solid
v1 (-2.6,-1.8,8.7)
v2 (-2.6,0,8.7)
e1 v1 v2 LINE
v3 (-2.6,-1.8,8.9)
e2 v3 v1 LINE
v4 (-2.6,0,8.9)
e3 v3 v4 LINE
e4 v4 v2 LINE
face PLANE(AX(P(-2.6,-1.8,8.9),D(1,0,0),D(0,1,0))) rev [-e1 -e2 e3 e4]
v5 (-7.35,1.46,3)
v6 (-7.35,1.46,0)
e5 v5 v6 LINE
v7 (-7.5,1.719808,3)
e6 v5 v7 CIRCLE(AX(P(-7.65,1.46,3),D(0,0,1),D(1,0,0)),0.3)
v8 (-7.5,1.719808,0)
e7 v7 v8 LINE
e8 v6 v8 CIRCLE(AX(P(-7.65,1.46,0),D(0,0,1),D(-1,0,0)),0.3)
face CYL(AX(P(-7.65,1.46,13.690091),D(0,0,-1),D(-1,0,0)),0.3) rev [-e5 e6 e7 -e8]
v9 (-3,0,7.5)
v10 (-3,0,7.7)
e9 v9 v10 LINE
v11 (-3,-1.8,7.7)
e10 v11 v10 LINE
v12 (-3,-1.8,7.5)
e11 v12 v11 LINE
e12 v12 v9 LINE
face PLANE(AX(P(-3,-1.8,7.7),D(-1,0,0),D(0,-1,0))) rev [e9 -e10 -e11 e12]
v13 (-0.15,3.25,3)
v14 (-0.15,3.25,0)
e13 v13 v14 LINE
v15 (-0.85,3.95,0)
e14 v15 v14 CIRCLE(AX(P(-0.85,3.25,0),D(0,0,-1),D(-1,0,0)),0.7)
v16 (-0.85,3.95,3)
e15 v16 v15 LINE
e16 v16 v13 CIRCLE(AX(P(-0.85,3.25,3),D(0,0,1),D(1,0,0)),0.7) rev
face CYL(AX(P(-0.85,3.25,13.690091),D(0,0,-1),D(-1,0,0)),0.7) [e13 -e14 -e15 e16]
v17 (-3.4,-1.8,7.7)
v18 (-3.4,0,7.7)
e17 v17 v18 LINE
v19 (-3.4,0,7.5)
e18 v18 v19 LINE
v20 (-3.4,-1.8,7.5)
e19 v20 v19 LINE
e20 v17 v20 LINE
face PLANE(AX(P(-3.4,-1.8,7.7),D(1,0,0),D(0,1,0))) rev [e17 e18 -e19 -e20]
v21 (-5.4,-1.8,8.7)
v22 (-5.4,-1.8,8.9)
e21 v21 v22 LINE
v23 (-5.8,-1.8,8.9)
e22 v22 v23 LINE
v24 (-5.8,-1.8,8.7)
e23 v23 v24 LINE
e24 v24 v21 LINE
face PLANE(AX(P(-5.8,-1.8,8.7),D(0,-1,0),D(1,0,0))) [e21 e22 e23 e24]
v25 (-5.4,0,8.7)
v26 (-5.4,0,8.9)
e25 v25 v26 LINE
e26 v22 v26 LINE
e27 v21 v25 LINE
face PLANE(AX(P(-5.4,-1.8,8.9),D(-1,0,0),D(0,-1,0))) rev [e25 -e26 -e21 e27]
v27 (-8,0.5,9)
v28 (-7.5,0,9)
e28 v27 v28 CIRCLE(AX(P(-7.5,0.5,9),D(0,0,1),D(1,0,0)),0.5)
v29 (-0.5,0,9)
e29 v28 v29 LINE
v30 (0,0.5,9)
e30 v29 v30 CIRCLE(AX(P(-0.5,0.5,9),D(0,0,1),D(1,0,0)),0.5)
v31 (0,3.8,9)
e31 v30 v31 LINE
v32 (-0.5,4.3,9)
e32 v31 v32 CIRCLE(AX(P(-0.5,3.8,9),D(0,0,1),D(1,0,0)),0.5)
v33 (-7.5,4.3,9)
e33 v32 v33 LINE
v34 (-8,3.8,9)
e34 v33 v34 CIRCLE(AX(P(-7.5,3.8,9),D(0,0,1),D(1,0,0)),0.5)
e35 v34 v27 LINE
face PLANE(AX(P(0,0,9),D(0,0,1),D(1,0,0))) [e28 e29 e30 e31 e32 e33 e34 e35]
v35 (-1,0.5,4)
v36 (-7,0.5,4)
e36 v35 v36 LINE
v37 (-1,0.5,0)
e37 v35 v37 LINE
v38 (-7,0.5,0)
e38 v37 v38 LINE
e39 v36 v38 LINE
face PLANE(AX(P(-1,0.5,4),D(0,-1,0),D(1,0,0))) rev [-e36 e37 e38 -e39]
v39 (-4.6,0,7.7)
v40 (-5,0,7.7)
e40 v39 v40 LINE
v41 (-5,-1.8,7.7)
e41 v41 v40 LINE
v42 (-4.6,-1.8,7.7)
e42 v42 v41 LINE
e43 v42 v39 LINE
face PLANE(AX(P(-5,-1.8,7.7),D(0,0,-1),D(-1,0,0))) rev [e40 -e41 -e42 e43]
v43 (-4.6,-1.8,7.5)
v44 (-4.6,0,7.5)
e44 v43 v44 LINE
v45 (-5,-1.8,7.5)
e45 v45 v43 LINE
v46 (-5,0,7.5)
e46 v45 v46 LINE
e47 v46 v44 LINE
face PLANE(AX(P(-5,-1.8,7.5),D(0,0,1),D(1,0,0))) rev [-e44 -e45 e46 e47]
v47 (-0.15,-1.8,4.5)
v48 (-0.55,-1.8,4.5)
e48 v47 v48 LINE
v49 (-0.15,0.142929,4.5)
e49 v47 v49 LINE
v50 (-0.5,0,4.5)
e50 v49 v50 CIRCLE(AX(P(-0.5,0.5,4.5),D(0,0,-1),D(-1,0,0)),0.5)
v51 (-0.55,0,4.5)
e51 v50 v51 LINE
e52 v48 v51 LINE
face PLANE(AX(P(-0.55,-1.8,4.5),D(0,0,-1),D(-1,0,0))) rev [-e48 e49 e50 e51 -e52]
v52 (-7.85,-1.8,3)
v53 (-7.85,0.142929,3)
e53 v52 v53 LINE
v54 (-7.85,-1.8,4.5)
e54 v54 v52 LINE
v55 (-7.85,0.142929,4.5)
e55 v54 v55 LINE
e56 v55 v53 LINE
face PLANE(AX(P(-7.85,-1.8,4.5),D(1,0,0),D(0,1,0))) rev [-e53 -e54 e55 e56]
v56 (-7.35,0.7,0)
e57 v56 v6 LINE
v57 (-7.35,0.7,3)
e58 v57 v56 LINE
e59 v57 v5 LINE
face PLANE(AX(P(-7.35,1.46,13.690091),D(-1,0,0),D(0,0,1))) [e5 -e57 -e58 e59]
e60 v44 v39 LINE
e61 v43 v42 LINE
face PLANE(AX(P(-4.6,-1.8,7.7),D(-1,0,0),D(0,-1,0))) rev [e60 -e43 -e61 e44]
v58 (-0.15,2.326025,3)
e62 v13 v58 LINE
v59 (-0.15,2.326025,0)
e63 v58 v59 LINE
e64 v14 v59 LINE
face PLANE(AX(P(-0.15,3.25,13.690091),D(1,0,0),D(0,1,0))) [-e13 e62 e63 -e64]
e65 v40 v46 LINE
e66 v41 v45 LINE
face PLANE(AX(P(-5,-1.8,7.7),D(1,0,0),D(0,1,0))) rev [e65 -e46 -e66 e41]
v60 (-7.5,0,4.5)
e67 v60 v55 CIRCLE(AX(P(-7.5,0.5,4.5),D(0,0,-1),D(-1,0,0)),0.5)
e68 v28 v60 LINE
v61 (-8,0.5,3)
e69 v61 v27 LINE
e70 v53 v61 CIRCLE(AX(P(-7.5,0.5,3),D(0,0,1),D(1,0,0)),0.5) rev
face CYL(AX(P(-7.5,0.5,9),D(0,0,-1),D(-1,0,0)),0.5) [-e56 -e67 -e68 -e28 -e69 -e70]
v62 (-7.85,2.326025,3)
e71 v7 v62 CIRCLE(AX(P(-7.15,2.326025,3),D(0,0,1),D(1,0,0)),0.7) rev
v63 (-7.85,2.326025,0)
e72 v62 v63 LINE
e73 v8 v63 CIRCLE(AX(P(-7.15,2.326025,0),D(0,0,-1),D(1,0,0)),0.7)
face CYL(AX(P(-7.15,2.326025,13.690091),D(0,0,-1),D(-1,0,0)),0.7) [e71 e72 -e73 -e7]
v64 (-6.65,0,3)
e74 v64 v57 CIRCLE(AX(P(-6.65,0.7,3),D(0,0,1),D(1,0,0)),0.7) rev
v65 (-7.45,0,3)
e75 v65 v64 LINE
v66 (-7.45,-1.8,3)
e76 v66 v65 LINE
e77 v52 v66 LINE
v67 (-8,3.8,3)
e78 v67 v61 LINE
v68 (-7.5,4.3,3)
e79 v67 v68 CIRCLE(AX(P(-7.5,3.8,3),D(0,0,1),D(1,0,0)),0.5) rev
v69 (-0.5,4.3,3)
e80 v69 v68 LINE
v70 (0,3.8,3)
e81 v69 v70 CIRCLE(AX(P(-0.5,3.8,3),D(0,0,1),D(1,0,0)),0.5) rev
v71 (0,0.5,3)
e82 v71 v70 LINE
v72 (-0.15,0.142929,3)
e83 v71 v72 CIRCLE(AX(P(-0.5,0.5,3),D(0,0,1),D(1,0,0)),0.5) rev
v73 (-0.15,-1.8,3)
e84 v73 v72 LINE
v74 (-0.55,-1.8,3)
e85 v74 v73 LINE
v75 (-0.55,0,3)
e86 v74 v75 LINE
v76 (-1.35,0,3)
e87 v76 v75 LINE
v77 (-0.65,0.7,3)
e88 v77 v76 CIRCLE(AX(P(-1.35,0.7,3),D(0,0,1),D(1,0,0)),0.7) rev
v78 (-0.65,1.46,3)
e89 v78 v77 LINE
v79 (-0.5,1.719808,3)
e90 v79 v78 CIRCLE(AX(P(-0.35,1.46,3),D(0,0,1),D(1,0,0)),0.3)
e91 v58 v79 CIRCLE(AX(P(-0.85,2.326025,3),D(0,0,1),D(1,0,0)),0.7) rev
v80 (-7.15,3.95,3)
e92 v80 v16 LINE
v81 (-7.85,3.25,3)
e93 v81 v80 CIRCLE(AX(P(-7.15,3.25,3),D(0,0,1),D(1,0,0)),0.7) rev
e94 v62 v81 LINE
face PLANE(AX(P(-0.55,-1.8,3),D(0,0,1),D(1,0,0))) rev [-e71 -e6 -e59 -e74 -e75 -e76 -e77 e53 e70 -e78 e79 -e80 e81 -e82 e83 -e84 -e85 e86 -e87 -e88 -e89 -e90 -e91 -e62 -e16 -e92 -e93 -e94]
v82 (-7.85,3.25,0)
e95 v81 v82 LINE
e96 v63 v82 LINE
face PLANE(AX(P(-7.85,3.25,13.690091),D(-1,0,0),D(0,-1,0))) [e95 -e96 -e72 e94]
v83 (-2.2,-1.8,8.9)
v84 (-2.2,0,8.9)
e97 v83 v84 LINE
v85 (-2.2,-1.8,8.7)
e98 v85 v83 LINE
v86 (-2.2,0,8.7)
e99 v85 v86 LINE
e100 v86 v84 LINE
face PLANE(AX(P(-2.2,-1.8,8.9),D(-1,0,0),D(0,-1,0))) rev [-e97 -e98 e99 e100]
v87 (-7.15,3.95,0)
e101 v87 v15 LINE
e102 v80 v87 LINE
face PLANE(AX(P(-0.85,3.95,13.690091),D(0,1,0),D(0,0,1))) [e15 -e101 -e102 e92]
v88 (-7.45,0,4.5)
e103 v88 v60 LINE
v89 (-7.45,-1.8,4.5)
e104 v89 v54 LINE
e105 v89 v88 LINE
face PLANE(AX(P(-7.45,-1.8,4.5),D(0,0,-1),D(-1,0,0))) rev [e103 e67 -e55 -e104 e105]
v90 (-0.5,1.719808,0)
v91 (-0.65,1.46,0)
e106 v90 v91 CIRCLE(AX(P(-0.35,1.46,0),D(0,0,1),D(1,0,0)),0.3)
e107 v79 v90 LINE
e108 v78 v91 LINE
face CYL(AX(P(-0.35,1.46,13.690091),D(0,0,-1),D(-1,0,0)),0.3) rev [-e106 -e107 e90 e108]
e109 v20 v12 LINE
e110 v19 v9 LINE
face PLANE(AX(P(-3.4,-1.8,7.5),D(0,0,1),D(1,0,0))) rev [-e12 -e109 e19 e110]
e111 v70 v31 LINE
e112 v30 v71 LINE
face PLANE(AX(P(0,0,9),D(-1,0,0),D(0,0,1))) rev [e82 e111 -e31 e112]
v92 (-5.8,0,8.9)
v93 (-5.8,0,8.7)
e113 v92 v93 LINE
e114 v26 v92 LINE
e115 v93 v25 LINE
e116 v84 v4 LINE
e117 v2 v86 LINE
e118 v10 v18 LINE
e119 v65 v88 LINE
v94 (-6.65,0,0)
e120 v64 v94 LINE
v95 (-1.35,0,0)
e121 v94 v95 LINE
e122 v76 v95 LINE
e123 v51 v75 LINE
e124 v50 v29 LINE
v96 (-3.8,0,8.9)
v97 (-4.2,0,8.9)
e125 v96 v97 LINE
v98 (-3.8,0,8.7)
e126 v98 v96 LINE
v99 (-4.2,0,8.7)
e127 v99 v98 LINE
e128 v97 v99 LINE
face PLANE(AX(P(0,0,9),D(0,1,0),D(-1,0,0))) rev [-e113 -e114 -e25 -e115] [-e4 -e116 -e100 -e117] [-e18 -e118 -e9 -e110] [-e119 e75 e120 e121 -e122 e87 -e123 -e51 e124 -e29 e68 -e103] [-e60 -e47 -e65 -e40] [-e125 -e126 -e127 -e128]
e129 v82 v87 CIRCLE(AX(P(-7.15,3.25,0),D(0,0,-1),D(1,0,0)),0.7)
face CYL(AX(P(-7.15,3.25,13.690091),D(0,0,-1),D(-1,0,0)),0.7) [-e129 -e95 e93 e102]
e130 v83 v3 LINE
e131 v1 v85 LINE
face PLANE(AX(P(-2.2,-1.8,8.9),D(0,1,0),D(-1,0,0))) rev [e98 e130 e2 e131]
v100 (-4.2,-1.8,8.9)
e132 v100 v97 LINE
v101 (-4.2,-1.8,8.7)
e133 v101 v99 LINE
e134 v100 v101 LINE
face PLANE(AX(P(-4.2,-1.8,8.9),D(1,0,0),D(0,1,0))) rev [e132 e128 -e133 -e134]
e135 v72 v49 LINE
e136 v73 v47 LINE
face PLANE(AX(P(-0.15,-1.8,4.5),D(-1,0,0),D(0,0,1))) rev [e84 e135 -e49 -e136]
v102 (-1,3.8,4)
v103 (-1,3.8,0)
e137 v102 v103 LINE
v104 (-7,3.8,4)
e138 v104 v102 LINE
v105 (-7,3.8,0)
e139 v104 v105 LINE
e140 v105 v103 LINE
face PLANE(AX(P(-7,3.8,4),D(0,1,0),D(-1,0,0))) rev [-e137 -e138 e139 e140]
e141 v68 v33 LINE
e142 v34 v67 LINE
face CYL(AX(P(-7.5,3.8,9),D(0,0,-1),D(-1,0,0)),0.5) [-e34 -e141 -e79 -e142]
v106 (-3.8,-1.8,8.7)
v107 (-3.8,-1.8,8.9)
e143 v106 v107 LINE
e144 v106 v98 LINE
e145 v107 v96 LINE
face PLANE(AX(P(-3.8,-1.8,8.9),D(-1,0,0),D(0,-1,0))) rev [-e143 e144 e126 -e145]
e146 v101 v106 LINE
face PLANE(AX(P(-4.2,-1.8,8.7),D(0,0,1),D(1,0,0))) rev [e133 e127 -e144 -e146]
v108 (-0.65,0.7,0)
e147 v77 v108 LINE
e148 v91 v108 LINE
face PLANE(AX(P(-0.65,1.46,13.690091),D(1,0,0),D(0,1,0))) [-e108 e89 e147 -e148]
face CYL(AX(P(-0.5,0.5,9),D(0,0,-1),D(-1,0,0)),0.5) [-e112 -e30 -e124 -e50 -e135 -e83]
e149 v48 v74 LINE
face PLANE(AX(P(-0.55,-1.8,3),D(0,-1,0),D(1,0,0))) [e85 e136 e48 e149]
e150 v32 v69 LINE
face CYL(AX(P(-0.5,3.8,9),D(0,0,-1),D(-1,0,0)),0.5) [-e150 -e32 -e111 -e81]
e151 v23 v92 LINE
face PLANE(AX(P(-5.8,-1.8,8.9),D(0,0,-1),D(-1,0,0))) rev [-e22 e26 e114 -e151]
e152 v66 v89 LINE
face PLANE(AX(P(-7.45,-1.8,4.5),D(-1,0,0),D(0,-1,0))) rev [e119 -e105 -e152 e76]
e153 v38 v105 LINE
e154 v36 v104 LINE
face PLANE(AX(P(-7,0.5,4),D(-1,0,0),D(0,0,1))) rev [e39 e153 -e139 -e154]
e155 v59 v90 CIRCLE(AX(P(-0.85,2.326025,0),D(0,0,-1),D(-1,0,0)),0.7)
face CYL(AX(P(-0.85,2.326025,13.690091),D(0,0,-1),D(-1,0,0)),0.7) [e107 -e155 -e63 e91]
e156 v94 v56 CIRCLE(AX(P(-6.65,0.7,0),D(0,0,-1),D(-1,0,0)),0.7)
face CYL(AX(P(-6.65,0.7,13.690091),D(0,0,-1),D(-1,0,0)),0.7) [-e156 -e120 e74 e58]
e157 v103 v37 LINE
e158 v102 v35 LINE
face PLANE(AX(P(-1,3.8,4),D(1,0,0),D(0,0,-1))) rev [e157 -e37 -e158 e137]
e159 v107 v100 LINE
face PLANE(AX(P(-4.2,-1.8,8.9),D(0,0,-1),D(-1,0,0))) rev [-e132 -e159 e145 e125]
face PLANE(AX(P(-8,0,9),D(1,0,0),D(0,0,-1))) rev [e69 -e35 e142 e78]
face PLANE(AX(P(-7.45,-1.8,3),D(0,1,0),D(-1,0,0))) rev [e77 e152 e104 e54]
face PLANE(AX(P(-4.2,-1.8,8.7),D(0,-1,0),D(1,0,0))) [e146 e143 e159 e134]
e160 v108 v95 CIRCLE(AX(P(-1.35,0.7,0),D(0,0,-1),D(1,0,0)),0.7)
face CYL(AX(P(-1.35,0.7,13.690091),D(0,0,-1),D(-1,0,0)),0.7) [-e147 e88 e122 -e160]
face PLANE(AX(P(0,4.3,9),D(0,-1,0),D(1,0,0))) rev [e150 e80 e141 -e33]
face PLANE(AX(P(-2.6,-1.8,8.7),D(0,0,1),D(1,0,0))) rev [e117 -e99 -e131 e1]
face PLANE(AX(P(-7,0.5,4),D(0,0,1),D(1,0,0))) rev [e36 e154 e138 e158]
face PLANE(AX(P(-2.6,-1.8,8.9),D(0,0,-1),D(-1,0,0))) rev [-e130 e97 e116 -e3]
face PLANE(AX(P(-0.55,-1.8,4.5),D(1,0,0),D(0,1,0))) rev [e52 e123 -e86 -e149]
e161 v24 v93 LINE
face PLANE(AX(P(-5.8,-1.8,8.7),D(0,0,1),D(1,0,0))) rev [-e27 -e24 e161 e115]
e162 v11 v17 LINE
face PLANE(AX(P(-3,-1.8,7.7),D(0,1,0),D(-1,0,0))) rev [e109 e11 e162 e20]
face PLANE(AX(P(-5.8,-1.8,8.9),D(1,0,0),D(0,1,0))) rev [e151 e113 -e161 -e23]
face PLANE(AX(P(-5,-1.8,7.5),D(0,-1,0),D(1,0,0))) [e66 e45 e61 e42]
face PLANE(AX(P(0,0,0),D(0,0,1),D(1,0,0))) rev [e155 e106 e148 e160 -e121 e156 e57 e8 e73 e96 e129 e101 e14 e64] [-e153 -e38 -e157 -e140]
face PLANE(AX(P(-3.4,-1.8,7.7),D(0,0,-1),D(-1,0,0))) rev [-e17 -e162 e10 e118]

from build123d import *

# Parameters (mm, degrees)
ESQUISSE1_W             = 8
ESQUISSE1_H             = 4.3
EXTRUSION1_DEPTH        = 9
ESQUISSE2_W             = 6
ESQUISSE2_H             = 3.3
ENL_V_MAT_EXTRU_1_DEPTH = 4
ESQUISSE3_W             = 0.4
ESQUISSE3_H             = 1.5
EXTRUSION2_DEPTH        = 1.8
CONG_1_R                = 0.5
ESQUISSE4_W             = 0.4
ESQUISSE4_H             = 0.2
EXTRUSION3_DEPTH        = 1.8
ENL_V_START             = -3
ENL_V_MAT_EXTRU_3_DEPTH = 3


# Read off the part's stored shape, not the designer's step: Enlèv. mat.-Extru.3
with BuildPart() as part:
    # Esquisse1 → Extrusion1 (new body)
    with BuildSketch(Plane.XY):
        with Locations((-4, 2.15)):
            Rectangle(ESQUISSE1_W, ESQUISSE1_H)
    extrude(amount=EXTRUSION1_DEPTH)

    # Esquisse2 → Enlèv. mat.-Extru.1 (cut)
    with BuildSketch(Plane(origin=(0, 0, 0), x_dir=(-1, 0, 0), z_dir=(0, 0, -1))):
        with Locations((4, 2.15)):
            Rectangle(ESQUISSE2_W, ESQUISSE2_H)
    extrude(amount=-ENL_V_MAT_EXTRU_1_DEPTH, mode=Mode.SUBTRACT)

    # Esquisse3 → Extrusion2 (add)
    with BuildSketch(Plane.XZ):
        with Locations((-0.35, 3.75)):
            Rectangle(ESQUISSE3_W, ESQUISSE3_H)
        with Locations((-7.65, 3.75)):
            Rectangle(ESQUISSE3_W, ESQUISSE3_H)
    extrude(amount=EXTRUSION2_DEPTH)

    # Congé1
    # the kernel refuses this fillet: 0.5 mm, written as the material it takes off along each edge
    with BuildSketch(Plane(origin=(0, 0, -1.25), x_dir=(-1, 0, 0), z_dir=(0, 0, 1))) as cong_1_piece_1_section:
        with BuildLine():
            CenterArc((CONG_1_R, -CONG_1_R), CONG_1_R, 90, 90)
            Line((0, -CONG_1_R), (0, 0))
            Line((0, 0), (CONG_1_R, 0))
        make_face()
    cong_1_piece_1 = extrude(amount=11.5, mode=Mode.PRIVATE)
    cong_1_piece_1 = split(cong_1_piece_1, bisect_by=Plane(origin=(-0.251340373, 0.033035409, 3), z_dir=(0, 0, -1)), keep=Keep.TOP, mode=Mode.PRIVATE)
    cong_1_piece_1 = split(cong_1_piece_1, bisect_by=Plane(origin=(-0.15, 0.033035409, 0.875), z_dir=(-1, 0, 0)), keep=Keep.TOP, mode=Mode.PRIVATE)
    add(cong_1_piece_1, mode=Mode.SUBTRACT)
    with BuildSketch(Plane(origin=(0, 0, -1.25), x_dir=(-1, 0, 0), z_dir=(0, 0, 1))) as cong_1_piece_2_section:
        with BuildLine():
            CenterArc((CONG_1_R, -CONG_1_R), CONG_1_R, 90, 90)
            Line((0, -CONG_1_R), (0, 0))
            Line((0, 0), (CONG_1_R, 0))
        make_face()
    cong_1_piece_2 = extrude(amount=11.5, mode=Mode.PRIVATE)
    cong_1_piece_2 = split(cong_1_piece_2, bisect_by=Plane(origin=(-0.054158411, 0.147457064, 3), z_dir=(0, 0, -1)), keep=Keep.TOP, mode=Mode.PRIVATE)
    cong_1_piece_2 = split(cong_1_piece_2, bisect_by=Plane(origin=(-0.15, 0.147457064, 0.875), z_dir=(1, 0, 0)), keep=Keep.TOP, mode=Mode.PRIVATE)
    add(cong_1_piece_2, mode=Mode.SUBTRACT)
    with BuildSketch(Plane(origin=(0, 0, -1.25), x_dir=(-1, 0, 0), z_dir=(0, 0, 1))) as cong_1_piece_3_section:
        with BuildLine():
            CenterArc((CONG_1_R, -CONG_1_R), CONG_1_R, 90, 90)
            Line((0, -CONG_1_R), (0, 0))
            Line((0, 0), (CONG_1_R, 0))
        make_face()
    cong_1_piece_3 = extrude(amount=11.5, mode=Mode.PRIVATE)
    cong_1_piece_3 = split(cong_1_piece_3, bisect_by=Plane(origin=(-0.054158411, 0.147457064, 3), z_dir=(0, 0, 1)), keep=Keep.TOP, mode=Mode.PRIVATE)
    cong_1_piece_3 = split(cong_1_piece_3, bisect_by=Plane(origin=(-0.15, 0.147457064, 3.75), z_dir=(1, 0, 0)), keep=Keep.TOP, mode=Mode.PRIVATE)
    cong_1_piece_3 = split(cong_1_piece_3, bisect_by=Plane(origin=(-0.054158411, 0.147457064, 4.5), z_dir=(0, 0, -1)), keep=Keep.TOP, mode=Mode.PRIVATE)
    add(cong_1_piece_3, mode=Mode.SUBTRACT)
    with BuildSketch(Plane(origin=(0, 0, -1.25), x_dir=(-1, 0, 0), z_dir=(0, 0, 1))) as cong_1_piece_4_section:
        with BuildLine():
            CenterArc((CONG_1_R, -CONG_1_R), CONG_1_R, 90, 90)
            Line((0, -CONG_1_R), (0, 0))
            Line((0, 0), (CONG_1_R, 0))
        make_face()
    cong_1_piece_4 = extrude(amount=11.5, mode=Mode.PRIVATE)
    cong_1_piece_4 = split(cong_1_piece_4, bisect_by=Plane(origin=(-0.15, 0.033035409, 7.375), z_dir=(-1, 0, 0)), keep=Keep.TOP, mode=Mode.PRIVATE)
    cong_1_piece_4 = split(cong_1_piece_4, bisect_by=Plane(origin=(-0.251340373, 0.033035409, 4.5), z_dir=(0, 0, 1)), keep=Keep.TOP, mode=Mode.PRIVATE)
    add(cong_1_piece_4, mode=Mode.SUBTRACT)
    with BuildSketch(Plane(origin=(0, 0, -1.25), x_dir=(-1, 0, 0), z_dir=(0, 0, 1))) as cong_1_piece_5_section:
        with BuildLine():
            CenterArc((CONG_1_R, -CONG_1_R), CONG_1_R, 90, 90)
            Line((0, -CONG_1_R), (0, 0))
            Line((0, 0), (CONG_1_R, 0))
        make_face()
    cong_1_piece_5 = extrude(amount=11.5, mode=Mode.PRIVATE)
    cong_1_piece_5 = split(cong_1_piece_5, bisect_by=Plane(origin=(-0.15, 0.147457064, 7.375), z_dir=(1, 0, 0)), keep=Keep.TOP, mode=Mode.PRIVATE)
    cong_1_piece_5 = split(cong_1_piece_5, bisect_by=Plane(origin=(-0.054158411, 0.147457064, 4.5), z_dir=(0, 0, 1)), keep=Keep.TOP, mode=Mode.PRIVATE)
    add(cong_1_piece_5, mode=Mode.SUBTRACT)
    with BuildSketch(Plane(origin=(-8, 0, -1.25), x_dir=(1, 0, 0), z_dir=(0, 0, 1))) as cong_1_piece_6_section:
        with BuildLine():
            CenterArc((CONG_1_R, CONG_1_R), CONG_1_R, 180, 90)
            Line((0, CONG_1_R), (0, 0))
            Line((0, 0), (CONG_1_R, 0))
        make_face()
    cong_1_piece_6 = extrude(amount=11.5, mode=Mode.PRIVATE)
    cong_1_piece_6 = split(cong_1_piece_6, bisect_by=Plane(origin=(-7.85, 0.033035409, 0.875), z_dir=(1, 0, 0)), keep=Keep.TOP, mode=Mode.PRIVATE)
    cong_1_piece_6 = split(cong_1_piece_6, bisect_by=Plane(origin=(-7.748659627, 0.033035409, 3), z_dir=(0, 0, -1)), keep=Keep.TOP, mode=Mode.PRIVATE)
    add(cong_1_piece_6, mode=Mode.SUBTRACT)
    with BuildSketch(Plane(origin=(-8, 0, -1.25), x_dir=(1, 0, 0), z_dir=(0, 0, 1))) as cong_1_piece_7_section:
        with BuildLine():
            CenterArc((CONG_1_R, CONG_1_R), CONG_1_R, 180, 90)
            Line((0, CONG_1_R), (0, 0))
            Line((0, 0), (CONG_1_R, 0))
        make_face()
    cong_1_piece_7 = extrude(amount=11.5, mode=Mode.PRIVATE)
    cong_1_piece_7 = split(cong_1_piece_7, bisect_by=Plane(origin=(-7.85, 0.147457064, 0.875), z_dir=(-1, 0, 0)), keep=Keep.TOP, mode=Mode.PRIVATE)
    cong_1_piece_7 = split(cong_1_piece_7, bisect_by=Plane(origin=(-7.945841589, 0.147457064, 3), z_dir=(0, 0, -1)), keep=Keep.TOP, mode=Mode.PRIVATE)
    add(cong_1_piece_7, mode=Mode.SUBTRACT)
    with BuildSketch(Plane(origin=(-8, 0, -1.25), x_dir=(1, 0, 0), z_dir=(0, 0, 1))) as cong_1_piece_8_section:
        with BuildLine():
            CenterArc((CONG_1_R, CONG_1_R), CONG_1_R, 180, 90)
            Line((0, CONG_1_R), (0, 0))
            Line((0, 0), (CONG_1_R, 0))
        make_face()
    cong_1_piece_8 = extrude(amount=11.5, mode=Mode.PRIVATE)
    cong_1_piece_8 = split(cong_1_piece_8, bisect_by=Plane(origin=(-7.945841589, 0.147457064, 4.5), z_dir=(0, 0, -1)), keep=Keep.TOP, mode=Mode.PRIVATE)
    cong_1_piece_8 = split(cong_1_piece_8, bisect_by=Plane(origin=(-7.85, 0.147457064, 3.75), z_dir=(-1, 0, 0)), keep=Keep.TOP, mode=Mode.PRIVATE)
    cong_1_piece_8 = split(cong_1_piece_8, bisect_by=Plane(origin=(-7.945841589, 0.147457064, 3), z_dir=(0, 0, 1)), keep=Keep.TOP, mode=Mode.PRIVATE)
    add(cong_1_piece_8, mode=Mode.SUBTRACT)
    with BuildSketch(Plane(origin=(-8, 0, -1.25), x_dir=(1, 0, 0), z_dir=(0, 0, 1))) as cong_1_piece_9_section:
        with BuildLine():
            CenterArc((CONG_1_R, CONG_1_R), CONG_1_R, 180, 90)
            Line((0, CONG_1_R), (0, 0))
            Line((0, 0), (CONG_1_R, 0))
        make_face()
    cong_1_piece_9 = extrude(amount=11.5, mode=Mode.PRIVATE)
    cong_1_piece_9 = split(cong_1_piece_9, bisect_by=Plane(origin=(-7.748659627, 0.033035409, 4.5), z_dir=(0, 0, 1)), keep=Keep.TOP, mode=Mode.PRIVATE)
    cong_1_piece_9 = split(cong_1_piece_9, bisect_by=Plane(origin=(-7.85, 0.033035409, 7.375), z_dir=(1, 0, 0)), keep=Keep.TOP, mode=Mode.PRIVATE)
    add(cong_1_piece_9, mode=Mode.SUBTRACT)
    with BuildSketch(Plane(origin=(-8, 0, -1.25), x_dir=(1, 0, 0), z_dir=(0, 0, 1))) as cong_1_piece_10_section:
        with BuildLine():
            CenterArc((CONG_1_R, CONG_1_R), CONG_1_R, 180, 90)
            Line((0, CONG_1_R), (0, 0))
            Line((0, 0), (CONG_1_R, 0))
        make_face()
    cong_1_piece_10 = extrude(amount=11.5, mode=Mode.PRIVATE)
    cong_1_piece_10 = split(cong_1_piece_10, bisect_by=Plane(origin=(-7.945841589, 0.147457064, 4.5), z_dir=(0, 0, 1)), keep=Keep.TOP, mode=Mode.PRIVATE)
    cong_1_piece_10 = split(cong_1_piece_10, bisect_by=Plane(origin=(-7.85, 0.147457064, 7.375), z_dir=(-1, 0, 0)), keep=Keep.TOP, mode=Mode.PRIVATE)
    add(cong_1_piece_10, mode=Mode.SUBTRACT)
    with BuildSketch(Plane(origin=(-8, 4.3, -1.25), x_dir=(0, -1, 0), z_dir=(0, 0, 1))) as cong_1_piece_11:
        with BuildLine():
            CenterArc((CONG_1_R, CONG_1_R), CONG_1_R, 180, 90)
            Line((0, CONG_1_R), (0, 0))
            Line((0, 0), (CONG_1_R, 0))
        make_face()
    extrude(amount=11.5, mode=Mode.SUBTRACT)
    with BuildSketch(Plane(origin=(0, 4.3, -1.25), x_dir=(0, -1, 0), z_dir=(0, 0, 1))) as cong_1_piece_12:
        with BuildLine():
            CenterArc((CONG_1_R, -CONG_1_R), CONG_1_R, 90, 90)
            Line((0, -CONG_1_R), (0, 0))
            Line((0, 0), (CONG_1_R, 0))
        make_face()
    extrude(amount=11.5, mode=Mode.SUBTRACT)

    # Esquisse4 → Extrusion3 (add)
    with BuildSketch(Plane.XZ):
        with Locations((-2.4, 8.8)):
            Rectangle(ESQUISSE4_W, ESQUISSE4_H)
        with Locations((-5.6, 8.8)):
            Rectangle(ESQUISSE4_W, ESQUISSE4_H)
        with Locations((-4, 8.8)):
            Rectangle(ESQUISSE4_W, ESQUISSE4_H)
        with Locations((-3.2, 7.6)):
            Rectangle(ESQUISSE4_W, ESQUISSE4_H)
        with Locations((-4.8, 7.6)):
            Rectangle(ESQUISSE4_W, ESQUISSE4_H)
    extrude(amount=EXTRUSION3_DEPTH)

    # Enlèv. mat.-Extru.3 outline → Enlèv. mat.-Extru.3 (cut)
    with BuildSketch(Plane(origin=(0, 0, 0), x_dir=(-1, 0, 0), z_dir=(0, 0, -1)).offset(ENL_V_START)):
        with BuildLine():
            Line((0.15, 2.326025404), (0.15, 3.25))
            ThreePointArc((0.15, 3.25), (0.355025253, 3.744974747), (0.85, 3.95))
            Line((0.85, 3.95), (7.15, 3.95))
            ThreePointArc((7.15, 3.95), (7.644974747, 3.744974747), (7.85, 3.25))
            Line((7.85, 3.25), (7.85, 2.326025404))
            ThreePointArc((7.85, 2.326025404), (7.756217783, 1.976025404), (7.5, 1.719807621))
            ThreePointArc((7.5, 1.719807621), (7.390192379, 1.61), (7.35, 1.46))
            Line((7.35, 1.46), (7.35, 0.7))
            ThreePointArc((7.35, 0.7), (7.144974747, 0.205025253), (6.65, 0))
            Line((6.65, 0), (7.5, 0))
            ThreePointArc((7.5, 0), (7.853553391, 0.146446609), (8, 0.5))
            Line((8, 0.5), (8, 3.8))
            ThreePointArc((8, 3.8), (7.853553391, 4.153553391), (7.5, 4.3))
            Line((7.5, 4.3), (0.5, 4.3))
            ThreePointArc((0.5, 4.3), (0.146446609, 4.153553391), (0, 3.8))
            Line((0, 3.8), (0, 0.5))
            ThreePointArc((0, 0.5), (0.146446609, 0.146446609), (0.5, 0))
            Line((0.5, 0), (1.35, 0))
            ThreePointArc((1.35, 0), (0.855025253, 0.205025253), (0.65, 0.7))
            Line((0.65, 0.7), (0.65, 1.46))
            ThreePointArc((0.65, 1.46), (0.609807621, 1.61), (0.5, 1.719807621))
            ThreePointArc((0.5, 1.719807621), (0.243782217, 1.976025404), (0.15, 2.326025404))
        make_face()
    extrude(amount=ENL_V_MAT_EXTRU_3_DEPTH, mode=Mode.SUBTRACT)


solid = part.part
